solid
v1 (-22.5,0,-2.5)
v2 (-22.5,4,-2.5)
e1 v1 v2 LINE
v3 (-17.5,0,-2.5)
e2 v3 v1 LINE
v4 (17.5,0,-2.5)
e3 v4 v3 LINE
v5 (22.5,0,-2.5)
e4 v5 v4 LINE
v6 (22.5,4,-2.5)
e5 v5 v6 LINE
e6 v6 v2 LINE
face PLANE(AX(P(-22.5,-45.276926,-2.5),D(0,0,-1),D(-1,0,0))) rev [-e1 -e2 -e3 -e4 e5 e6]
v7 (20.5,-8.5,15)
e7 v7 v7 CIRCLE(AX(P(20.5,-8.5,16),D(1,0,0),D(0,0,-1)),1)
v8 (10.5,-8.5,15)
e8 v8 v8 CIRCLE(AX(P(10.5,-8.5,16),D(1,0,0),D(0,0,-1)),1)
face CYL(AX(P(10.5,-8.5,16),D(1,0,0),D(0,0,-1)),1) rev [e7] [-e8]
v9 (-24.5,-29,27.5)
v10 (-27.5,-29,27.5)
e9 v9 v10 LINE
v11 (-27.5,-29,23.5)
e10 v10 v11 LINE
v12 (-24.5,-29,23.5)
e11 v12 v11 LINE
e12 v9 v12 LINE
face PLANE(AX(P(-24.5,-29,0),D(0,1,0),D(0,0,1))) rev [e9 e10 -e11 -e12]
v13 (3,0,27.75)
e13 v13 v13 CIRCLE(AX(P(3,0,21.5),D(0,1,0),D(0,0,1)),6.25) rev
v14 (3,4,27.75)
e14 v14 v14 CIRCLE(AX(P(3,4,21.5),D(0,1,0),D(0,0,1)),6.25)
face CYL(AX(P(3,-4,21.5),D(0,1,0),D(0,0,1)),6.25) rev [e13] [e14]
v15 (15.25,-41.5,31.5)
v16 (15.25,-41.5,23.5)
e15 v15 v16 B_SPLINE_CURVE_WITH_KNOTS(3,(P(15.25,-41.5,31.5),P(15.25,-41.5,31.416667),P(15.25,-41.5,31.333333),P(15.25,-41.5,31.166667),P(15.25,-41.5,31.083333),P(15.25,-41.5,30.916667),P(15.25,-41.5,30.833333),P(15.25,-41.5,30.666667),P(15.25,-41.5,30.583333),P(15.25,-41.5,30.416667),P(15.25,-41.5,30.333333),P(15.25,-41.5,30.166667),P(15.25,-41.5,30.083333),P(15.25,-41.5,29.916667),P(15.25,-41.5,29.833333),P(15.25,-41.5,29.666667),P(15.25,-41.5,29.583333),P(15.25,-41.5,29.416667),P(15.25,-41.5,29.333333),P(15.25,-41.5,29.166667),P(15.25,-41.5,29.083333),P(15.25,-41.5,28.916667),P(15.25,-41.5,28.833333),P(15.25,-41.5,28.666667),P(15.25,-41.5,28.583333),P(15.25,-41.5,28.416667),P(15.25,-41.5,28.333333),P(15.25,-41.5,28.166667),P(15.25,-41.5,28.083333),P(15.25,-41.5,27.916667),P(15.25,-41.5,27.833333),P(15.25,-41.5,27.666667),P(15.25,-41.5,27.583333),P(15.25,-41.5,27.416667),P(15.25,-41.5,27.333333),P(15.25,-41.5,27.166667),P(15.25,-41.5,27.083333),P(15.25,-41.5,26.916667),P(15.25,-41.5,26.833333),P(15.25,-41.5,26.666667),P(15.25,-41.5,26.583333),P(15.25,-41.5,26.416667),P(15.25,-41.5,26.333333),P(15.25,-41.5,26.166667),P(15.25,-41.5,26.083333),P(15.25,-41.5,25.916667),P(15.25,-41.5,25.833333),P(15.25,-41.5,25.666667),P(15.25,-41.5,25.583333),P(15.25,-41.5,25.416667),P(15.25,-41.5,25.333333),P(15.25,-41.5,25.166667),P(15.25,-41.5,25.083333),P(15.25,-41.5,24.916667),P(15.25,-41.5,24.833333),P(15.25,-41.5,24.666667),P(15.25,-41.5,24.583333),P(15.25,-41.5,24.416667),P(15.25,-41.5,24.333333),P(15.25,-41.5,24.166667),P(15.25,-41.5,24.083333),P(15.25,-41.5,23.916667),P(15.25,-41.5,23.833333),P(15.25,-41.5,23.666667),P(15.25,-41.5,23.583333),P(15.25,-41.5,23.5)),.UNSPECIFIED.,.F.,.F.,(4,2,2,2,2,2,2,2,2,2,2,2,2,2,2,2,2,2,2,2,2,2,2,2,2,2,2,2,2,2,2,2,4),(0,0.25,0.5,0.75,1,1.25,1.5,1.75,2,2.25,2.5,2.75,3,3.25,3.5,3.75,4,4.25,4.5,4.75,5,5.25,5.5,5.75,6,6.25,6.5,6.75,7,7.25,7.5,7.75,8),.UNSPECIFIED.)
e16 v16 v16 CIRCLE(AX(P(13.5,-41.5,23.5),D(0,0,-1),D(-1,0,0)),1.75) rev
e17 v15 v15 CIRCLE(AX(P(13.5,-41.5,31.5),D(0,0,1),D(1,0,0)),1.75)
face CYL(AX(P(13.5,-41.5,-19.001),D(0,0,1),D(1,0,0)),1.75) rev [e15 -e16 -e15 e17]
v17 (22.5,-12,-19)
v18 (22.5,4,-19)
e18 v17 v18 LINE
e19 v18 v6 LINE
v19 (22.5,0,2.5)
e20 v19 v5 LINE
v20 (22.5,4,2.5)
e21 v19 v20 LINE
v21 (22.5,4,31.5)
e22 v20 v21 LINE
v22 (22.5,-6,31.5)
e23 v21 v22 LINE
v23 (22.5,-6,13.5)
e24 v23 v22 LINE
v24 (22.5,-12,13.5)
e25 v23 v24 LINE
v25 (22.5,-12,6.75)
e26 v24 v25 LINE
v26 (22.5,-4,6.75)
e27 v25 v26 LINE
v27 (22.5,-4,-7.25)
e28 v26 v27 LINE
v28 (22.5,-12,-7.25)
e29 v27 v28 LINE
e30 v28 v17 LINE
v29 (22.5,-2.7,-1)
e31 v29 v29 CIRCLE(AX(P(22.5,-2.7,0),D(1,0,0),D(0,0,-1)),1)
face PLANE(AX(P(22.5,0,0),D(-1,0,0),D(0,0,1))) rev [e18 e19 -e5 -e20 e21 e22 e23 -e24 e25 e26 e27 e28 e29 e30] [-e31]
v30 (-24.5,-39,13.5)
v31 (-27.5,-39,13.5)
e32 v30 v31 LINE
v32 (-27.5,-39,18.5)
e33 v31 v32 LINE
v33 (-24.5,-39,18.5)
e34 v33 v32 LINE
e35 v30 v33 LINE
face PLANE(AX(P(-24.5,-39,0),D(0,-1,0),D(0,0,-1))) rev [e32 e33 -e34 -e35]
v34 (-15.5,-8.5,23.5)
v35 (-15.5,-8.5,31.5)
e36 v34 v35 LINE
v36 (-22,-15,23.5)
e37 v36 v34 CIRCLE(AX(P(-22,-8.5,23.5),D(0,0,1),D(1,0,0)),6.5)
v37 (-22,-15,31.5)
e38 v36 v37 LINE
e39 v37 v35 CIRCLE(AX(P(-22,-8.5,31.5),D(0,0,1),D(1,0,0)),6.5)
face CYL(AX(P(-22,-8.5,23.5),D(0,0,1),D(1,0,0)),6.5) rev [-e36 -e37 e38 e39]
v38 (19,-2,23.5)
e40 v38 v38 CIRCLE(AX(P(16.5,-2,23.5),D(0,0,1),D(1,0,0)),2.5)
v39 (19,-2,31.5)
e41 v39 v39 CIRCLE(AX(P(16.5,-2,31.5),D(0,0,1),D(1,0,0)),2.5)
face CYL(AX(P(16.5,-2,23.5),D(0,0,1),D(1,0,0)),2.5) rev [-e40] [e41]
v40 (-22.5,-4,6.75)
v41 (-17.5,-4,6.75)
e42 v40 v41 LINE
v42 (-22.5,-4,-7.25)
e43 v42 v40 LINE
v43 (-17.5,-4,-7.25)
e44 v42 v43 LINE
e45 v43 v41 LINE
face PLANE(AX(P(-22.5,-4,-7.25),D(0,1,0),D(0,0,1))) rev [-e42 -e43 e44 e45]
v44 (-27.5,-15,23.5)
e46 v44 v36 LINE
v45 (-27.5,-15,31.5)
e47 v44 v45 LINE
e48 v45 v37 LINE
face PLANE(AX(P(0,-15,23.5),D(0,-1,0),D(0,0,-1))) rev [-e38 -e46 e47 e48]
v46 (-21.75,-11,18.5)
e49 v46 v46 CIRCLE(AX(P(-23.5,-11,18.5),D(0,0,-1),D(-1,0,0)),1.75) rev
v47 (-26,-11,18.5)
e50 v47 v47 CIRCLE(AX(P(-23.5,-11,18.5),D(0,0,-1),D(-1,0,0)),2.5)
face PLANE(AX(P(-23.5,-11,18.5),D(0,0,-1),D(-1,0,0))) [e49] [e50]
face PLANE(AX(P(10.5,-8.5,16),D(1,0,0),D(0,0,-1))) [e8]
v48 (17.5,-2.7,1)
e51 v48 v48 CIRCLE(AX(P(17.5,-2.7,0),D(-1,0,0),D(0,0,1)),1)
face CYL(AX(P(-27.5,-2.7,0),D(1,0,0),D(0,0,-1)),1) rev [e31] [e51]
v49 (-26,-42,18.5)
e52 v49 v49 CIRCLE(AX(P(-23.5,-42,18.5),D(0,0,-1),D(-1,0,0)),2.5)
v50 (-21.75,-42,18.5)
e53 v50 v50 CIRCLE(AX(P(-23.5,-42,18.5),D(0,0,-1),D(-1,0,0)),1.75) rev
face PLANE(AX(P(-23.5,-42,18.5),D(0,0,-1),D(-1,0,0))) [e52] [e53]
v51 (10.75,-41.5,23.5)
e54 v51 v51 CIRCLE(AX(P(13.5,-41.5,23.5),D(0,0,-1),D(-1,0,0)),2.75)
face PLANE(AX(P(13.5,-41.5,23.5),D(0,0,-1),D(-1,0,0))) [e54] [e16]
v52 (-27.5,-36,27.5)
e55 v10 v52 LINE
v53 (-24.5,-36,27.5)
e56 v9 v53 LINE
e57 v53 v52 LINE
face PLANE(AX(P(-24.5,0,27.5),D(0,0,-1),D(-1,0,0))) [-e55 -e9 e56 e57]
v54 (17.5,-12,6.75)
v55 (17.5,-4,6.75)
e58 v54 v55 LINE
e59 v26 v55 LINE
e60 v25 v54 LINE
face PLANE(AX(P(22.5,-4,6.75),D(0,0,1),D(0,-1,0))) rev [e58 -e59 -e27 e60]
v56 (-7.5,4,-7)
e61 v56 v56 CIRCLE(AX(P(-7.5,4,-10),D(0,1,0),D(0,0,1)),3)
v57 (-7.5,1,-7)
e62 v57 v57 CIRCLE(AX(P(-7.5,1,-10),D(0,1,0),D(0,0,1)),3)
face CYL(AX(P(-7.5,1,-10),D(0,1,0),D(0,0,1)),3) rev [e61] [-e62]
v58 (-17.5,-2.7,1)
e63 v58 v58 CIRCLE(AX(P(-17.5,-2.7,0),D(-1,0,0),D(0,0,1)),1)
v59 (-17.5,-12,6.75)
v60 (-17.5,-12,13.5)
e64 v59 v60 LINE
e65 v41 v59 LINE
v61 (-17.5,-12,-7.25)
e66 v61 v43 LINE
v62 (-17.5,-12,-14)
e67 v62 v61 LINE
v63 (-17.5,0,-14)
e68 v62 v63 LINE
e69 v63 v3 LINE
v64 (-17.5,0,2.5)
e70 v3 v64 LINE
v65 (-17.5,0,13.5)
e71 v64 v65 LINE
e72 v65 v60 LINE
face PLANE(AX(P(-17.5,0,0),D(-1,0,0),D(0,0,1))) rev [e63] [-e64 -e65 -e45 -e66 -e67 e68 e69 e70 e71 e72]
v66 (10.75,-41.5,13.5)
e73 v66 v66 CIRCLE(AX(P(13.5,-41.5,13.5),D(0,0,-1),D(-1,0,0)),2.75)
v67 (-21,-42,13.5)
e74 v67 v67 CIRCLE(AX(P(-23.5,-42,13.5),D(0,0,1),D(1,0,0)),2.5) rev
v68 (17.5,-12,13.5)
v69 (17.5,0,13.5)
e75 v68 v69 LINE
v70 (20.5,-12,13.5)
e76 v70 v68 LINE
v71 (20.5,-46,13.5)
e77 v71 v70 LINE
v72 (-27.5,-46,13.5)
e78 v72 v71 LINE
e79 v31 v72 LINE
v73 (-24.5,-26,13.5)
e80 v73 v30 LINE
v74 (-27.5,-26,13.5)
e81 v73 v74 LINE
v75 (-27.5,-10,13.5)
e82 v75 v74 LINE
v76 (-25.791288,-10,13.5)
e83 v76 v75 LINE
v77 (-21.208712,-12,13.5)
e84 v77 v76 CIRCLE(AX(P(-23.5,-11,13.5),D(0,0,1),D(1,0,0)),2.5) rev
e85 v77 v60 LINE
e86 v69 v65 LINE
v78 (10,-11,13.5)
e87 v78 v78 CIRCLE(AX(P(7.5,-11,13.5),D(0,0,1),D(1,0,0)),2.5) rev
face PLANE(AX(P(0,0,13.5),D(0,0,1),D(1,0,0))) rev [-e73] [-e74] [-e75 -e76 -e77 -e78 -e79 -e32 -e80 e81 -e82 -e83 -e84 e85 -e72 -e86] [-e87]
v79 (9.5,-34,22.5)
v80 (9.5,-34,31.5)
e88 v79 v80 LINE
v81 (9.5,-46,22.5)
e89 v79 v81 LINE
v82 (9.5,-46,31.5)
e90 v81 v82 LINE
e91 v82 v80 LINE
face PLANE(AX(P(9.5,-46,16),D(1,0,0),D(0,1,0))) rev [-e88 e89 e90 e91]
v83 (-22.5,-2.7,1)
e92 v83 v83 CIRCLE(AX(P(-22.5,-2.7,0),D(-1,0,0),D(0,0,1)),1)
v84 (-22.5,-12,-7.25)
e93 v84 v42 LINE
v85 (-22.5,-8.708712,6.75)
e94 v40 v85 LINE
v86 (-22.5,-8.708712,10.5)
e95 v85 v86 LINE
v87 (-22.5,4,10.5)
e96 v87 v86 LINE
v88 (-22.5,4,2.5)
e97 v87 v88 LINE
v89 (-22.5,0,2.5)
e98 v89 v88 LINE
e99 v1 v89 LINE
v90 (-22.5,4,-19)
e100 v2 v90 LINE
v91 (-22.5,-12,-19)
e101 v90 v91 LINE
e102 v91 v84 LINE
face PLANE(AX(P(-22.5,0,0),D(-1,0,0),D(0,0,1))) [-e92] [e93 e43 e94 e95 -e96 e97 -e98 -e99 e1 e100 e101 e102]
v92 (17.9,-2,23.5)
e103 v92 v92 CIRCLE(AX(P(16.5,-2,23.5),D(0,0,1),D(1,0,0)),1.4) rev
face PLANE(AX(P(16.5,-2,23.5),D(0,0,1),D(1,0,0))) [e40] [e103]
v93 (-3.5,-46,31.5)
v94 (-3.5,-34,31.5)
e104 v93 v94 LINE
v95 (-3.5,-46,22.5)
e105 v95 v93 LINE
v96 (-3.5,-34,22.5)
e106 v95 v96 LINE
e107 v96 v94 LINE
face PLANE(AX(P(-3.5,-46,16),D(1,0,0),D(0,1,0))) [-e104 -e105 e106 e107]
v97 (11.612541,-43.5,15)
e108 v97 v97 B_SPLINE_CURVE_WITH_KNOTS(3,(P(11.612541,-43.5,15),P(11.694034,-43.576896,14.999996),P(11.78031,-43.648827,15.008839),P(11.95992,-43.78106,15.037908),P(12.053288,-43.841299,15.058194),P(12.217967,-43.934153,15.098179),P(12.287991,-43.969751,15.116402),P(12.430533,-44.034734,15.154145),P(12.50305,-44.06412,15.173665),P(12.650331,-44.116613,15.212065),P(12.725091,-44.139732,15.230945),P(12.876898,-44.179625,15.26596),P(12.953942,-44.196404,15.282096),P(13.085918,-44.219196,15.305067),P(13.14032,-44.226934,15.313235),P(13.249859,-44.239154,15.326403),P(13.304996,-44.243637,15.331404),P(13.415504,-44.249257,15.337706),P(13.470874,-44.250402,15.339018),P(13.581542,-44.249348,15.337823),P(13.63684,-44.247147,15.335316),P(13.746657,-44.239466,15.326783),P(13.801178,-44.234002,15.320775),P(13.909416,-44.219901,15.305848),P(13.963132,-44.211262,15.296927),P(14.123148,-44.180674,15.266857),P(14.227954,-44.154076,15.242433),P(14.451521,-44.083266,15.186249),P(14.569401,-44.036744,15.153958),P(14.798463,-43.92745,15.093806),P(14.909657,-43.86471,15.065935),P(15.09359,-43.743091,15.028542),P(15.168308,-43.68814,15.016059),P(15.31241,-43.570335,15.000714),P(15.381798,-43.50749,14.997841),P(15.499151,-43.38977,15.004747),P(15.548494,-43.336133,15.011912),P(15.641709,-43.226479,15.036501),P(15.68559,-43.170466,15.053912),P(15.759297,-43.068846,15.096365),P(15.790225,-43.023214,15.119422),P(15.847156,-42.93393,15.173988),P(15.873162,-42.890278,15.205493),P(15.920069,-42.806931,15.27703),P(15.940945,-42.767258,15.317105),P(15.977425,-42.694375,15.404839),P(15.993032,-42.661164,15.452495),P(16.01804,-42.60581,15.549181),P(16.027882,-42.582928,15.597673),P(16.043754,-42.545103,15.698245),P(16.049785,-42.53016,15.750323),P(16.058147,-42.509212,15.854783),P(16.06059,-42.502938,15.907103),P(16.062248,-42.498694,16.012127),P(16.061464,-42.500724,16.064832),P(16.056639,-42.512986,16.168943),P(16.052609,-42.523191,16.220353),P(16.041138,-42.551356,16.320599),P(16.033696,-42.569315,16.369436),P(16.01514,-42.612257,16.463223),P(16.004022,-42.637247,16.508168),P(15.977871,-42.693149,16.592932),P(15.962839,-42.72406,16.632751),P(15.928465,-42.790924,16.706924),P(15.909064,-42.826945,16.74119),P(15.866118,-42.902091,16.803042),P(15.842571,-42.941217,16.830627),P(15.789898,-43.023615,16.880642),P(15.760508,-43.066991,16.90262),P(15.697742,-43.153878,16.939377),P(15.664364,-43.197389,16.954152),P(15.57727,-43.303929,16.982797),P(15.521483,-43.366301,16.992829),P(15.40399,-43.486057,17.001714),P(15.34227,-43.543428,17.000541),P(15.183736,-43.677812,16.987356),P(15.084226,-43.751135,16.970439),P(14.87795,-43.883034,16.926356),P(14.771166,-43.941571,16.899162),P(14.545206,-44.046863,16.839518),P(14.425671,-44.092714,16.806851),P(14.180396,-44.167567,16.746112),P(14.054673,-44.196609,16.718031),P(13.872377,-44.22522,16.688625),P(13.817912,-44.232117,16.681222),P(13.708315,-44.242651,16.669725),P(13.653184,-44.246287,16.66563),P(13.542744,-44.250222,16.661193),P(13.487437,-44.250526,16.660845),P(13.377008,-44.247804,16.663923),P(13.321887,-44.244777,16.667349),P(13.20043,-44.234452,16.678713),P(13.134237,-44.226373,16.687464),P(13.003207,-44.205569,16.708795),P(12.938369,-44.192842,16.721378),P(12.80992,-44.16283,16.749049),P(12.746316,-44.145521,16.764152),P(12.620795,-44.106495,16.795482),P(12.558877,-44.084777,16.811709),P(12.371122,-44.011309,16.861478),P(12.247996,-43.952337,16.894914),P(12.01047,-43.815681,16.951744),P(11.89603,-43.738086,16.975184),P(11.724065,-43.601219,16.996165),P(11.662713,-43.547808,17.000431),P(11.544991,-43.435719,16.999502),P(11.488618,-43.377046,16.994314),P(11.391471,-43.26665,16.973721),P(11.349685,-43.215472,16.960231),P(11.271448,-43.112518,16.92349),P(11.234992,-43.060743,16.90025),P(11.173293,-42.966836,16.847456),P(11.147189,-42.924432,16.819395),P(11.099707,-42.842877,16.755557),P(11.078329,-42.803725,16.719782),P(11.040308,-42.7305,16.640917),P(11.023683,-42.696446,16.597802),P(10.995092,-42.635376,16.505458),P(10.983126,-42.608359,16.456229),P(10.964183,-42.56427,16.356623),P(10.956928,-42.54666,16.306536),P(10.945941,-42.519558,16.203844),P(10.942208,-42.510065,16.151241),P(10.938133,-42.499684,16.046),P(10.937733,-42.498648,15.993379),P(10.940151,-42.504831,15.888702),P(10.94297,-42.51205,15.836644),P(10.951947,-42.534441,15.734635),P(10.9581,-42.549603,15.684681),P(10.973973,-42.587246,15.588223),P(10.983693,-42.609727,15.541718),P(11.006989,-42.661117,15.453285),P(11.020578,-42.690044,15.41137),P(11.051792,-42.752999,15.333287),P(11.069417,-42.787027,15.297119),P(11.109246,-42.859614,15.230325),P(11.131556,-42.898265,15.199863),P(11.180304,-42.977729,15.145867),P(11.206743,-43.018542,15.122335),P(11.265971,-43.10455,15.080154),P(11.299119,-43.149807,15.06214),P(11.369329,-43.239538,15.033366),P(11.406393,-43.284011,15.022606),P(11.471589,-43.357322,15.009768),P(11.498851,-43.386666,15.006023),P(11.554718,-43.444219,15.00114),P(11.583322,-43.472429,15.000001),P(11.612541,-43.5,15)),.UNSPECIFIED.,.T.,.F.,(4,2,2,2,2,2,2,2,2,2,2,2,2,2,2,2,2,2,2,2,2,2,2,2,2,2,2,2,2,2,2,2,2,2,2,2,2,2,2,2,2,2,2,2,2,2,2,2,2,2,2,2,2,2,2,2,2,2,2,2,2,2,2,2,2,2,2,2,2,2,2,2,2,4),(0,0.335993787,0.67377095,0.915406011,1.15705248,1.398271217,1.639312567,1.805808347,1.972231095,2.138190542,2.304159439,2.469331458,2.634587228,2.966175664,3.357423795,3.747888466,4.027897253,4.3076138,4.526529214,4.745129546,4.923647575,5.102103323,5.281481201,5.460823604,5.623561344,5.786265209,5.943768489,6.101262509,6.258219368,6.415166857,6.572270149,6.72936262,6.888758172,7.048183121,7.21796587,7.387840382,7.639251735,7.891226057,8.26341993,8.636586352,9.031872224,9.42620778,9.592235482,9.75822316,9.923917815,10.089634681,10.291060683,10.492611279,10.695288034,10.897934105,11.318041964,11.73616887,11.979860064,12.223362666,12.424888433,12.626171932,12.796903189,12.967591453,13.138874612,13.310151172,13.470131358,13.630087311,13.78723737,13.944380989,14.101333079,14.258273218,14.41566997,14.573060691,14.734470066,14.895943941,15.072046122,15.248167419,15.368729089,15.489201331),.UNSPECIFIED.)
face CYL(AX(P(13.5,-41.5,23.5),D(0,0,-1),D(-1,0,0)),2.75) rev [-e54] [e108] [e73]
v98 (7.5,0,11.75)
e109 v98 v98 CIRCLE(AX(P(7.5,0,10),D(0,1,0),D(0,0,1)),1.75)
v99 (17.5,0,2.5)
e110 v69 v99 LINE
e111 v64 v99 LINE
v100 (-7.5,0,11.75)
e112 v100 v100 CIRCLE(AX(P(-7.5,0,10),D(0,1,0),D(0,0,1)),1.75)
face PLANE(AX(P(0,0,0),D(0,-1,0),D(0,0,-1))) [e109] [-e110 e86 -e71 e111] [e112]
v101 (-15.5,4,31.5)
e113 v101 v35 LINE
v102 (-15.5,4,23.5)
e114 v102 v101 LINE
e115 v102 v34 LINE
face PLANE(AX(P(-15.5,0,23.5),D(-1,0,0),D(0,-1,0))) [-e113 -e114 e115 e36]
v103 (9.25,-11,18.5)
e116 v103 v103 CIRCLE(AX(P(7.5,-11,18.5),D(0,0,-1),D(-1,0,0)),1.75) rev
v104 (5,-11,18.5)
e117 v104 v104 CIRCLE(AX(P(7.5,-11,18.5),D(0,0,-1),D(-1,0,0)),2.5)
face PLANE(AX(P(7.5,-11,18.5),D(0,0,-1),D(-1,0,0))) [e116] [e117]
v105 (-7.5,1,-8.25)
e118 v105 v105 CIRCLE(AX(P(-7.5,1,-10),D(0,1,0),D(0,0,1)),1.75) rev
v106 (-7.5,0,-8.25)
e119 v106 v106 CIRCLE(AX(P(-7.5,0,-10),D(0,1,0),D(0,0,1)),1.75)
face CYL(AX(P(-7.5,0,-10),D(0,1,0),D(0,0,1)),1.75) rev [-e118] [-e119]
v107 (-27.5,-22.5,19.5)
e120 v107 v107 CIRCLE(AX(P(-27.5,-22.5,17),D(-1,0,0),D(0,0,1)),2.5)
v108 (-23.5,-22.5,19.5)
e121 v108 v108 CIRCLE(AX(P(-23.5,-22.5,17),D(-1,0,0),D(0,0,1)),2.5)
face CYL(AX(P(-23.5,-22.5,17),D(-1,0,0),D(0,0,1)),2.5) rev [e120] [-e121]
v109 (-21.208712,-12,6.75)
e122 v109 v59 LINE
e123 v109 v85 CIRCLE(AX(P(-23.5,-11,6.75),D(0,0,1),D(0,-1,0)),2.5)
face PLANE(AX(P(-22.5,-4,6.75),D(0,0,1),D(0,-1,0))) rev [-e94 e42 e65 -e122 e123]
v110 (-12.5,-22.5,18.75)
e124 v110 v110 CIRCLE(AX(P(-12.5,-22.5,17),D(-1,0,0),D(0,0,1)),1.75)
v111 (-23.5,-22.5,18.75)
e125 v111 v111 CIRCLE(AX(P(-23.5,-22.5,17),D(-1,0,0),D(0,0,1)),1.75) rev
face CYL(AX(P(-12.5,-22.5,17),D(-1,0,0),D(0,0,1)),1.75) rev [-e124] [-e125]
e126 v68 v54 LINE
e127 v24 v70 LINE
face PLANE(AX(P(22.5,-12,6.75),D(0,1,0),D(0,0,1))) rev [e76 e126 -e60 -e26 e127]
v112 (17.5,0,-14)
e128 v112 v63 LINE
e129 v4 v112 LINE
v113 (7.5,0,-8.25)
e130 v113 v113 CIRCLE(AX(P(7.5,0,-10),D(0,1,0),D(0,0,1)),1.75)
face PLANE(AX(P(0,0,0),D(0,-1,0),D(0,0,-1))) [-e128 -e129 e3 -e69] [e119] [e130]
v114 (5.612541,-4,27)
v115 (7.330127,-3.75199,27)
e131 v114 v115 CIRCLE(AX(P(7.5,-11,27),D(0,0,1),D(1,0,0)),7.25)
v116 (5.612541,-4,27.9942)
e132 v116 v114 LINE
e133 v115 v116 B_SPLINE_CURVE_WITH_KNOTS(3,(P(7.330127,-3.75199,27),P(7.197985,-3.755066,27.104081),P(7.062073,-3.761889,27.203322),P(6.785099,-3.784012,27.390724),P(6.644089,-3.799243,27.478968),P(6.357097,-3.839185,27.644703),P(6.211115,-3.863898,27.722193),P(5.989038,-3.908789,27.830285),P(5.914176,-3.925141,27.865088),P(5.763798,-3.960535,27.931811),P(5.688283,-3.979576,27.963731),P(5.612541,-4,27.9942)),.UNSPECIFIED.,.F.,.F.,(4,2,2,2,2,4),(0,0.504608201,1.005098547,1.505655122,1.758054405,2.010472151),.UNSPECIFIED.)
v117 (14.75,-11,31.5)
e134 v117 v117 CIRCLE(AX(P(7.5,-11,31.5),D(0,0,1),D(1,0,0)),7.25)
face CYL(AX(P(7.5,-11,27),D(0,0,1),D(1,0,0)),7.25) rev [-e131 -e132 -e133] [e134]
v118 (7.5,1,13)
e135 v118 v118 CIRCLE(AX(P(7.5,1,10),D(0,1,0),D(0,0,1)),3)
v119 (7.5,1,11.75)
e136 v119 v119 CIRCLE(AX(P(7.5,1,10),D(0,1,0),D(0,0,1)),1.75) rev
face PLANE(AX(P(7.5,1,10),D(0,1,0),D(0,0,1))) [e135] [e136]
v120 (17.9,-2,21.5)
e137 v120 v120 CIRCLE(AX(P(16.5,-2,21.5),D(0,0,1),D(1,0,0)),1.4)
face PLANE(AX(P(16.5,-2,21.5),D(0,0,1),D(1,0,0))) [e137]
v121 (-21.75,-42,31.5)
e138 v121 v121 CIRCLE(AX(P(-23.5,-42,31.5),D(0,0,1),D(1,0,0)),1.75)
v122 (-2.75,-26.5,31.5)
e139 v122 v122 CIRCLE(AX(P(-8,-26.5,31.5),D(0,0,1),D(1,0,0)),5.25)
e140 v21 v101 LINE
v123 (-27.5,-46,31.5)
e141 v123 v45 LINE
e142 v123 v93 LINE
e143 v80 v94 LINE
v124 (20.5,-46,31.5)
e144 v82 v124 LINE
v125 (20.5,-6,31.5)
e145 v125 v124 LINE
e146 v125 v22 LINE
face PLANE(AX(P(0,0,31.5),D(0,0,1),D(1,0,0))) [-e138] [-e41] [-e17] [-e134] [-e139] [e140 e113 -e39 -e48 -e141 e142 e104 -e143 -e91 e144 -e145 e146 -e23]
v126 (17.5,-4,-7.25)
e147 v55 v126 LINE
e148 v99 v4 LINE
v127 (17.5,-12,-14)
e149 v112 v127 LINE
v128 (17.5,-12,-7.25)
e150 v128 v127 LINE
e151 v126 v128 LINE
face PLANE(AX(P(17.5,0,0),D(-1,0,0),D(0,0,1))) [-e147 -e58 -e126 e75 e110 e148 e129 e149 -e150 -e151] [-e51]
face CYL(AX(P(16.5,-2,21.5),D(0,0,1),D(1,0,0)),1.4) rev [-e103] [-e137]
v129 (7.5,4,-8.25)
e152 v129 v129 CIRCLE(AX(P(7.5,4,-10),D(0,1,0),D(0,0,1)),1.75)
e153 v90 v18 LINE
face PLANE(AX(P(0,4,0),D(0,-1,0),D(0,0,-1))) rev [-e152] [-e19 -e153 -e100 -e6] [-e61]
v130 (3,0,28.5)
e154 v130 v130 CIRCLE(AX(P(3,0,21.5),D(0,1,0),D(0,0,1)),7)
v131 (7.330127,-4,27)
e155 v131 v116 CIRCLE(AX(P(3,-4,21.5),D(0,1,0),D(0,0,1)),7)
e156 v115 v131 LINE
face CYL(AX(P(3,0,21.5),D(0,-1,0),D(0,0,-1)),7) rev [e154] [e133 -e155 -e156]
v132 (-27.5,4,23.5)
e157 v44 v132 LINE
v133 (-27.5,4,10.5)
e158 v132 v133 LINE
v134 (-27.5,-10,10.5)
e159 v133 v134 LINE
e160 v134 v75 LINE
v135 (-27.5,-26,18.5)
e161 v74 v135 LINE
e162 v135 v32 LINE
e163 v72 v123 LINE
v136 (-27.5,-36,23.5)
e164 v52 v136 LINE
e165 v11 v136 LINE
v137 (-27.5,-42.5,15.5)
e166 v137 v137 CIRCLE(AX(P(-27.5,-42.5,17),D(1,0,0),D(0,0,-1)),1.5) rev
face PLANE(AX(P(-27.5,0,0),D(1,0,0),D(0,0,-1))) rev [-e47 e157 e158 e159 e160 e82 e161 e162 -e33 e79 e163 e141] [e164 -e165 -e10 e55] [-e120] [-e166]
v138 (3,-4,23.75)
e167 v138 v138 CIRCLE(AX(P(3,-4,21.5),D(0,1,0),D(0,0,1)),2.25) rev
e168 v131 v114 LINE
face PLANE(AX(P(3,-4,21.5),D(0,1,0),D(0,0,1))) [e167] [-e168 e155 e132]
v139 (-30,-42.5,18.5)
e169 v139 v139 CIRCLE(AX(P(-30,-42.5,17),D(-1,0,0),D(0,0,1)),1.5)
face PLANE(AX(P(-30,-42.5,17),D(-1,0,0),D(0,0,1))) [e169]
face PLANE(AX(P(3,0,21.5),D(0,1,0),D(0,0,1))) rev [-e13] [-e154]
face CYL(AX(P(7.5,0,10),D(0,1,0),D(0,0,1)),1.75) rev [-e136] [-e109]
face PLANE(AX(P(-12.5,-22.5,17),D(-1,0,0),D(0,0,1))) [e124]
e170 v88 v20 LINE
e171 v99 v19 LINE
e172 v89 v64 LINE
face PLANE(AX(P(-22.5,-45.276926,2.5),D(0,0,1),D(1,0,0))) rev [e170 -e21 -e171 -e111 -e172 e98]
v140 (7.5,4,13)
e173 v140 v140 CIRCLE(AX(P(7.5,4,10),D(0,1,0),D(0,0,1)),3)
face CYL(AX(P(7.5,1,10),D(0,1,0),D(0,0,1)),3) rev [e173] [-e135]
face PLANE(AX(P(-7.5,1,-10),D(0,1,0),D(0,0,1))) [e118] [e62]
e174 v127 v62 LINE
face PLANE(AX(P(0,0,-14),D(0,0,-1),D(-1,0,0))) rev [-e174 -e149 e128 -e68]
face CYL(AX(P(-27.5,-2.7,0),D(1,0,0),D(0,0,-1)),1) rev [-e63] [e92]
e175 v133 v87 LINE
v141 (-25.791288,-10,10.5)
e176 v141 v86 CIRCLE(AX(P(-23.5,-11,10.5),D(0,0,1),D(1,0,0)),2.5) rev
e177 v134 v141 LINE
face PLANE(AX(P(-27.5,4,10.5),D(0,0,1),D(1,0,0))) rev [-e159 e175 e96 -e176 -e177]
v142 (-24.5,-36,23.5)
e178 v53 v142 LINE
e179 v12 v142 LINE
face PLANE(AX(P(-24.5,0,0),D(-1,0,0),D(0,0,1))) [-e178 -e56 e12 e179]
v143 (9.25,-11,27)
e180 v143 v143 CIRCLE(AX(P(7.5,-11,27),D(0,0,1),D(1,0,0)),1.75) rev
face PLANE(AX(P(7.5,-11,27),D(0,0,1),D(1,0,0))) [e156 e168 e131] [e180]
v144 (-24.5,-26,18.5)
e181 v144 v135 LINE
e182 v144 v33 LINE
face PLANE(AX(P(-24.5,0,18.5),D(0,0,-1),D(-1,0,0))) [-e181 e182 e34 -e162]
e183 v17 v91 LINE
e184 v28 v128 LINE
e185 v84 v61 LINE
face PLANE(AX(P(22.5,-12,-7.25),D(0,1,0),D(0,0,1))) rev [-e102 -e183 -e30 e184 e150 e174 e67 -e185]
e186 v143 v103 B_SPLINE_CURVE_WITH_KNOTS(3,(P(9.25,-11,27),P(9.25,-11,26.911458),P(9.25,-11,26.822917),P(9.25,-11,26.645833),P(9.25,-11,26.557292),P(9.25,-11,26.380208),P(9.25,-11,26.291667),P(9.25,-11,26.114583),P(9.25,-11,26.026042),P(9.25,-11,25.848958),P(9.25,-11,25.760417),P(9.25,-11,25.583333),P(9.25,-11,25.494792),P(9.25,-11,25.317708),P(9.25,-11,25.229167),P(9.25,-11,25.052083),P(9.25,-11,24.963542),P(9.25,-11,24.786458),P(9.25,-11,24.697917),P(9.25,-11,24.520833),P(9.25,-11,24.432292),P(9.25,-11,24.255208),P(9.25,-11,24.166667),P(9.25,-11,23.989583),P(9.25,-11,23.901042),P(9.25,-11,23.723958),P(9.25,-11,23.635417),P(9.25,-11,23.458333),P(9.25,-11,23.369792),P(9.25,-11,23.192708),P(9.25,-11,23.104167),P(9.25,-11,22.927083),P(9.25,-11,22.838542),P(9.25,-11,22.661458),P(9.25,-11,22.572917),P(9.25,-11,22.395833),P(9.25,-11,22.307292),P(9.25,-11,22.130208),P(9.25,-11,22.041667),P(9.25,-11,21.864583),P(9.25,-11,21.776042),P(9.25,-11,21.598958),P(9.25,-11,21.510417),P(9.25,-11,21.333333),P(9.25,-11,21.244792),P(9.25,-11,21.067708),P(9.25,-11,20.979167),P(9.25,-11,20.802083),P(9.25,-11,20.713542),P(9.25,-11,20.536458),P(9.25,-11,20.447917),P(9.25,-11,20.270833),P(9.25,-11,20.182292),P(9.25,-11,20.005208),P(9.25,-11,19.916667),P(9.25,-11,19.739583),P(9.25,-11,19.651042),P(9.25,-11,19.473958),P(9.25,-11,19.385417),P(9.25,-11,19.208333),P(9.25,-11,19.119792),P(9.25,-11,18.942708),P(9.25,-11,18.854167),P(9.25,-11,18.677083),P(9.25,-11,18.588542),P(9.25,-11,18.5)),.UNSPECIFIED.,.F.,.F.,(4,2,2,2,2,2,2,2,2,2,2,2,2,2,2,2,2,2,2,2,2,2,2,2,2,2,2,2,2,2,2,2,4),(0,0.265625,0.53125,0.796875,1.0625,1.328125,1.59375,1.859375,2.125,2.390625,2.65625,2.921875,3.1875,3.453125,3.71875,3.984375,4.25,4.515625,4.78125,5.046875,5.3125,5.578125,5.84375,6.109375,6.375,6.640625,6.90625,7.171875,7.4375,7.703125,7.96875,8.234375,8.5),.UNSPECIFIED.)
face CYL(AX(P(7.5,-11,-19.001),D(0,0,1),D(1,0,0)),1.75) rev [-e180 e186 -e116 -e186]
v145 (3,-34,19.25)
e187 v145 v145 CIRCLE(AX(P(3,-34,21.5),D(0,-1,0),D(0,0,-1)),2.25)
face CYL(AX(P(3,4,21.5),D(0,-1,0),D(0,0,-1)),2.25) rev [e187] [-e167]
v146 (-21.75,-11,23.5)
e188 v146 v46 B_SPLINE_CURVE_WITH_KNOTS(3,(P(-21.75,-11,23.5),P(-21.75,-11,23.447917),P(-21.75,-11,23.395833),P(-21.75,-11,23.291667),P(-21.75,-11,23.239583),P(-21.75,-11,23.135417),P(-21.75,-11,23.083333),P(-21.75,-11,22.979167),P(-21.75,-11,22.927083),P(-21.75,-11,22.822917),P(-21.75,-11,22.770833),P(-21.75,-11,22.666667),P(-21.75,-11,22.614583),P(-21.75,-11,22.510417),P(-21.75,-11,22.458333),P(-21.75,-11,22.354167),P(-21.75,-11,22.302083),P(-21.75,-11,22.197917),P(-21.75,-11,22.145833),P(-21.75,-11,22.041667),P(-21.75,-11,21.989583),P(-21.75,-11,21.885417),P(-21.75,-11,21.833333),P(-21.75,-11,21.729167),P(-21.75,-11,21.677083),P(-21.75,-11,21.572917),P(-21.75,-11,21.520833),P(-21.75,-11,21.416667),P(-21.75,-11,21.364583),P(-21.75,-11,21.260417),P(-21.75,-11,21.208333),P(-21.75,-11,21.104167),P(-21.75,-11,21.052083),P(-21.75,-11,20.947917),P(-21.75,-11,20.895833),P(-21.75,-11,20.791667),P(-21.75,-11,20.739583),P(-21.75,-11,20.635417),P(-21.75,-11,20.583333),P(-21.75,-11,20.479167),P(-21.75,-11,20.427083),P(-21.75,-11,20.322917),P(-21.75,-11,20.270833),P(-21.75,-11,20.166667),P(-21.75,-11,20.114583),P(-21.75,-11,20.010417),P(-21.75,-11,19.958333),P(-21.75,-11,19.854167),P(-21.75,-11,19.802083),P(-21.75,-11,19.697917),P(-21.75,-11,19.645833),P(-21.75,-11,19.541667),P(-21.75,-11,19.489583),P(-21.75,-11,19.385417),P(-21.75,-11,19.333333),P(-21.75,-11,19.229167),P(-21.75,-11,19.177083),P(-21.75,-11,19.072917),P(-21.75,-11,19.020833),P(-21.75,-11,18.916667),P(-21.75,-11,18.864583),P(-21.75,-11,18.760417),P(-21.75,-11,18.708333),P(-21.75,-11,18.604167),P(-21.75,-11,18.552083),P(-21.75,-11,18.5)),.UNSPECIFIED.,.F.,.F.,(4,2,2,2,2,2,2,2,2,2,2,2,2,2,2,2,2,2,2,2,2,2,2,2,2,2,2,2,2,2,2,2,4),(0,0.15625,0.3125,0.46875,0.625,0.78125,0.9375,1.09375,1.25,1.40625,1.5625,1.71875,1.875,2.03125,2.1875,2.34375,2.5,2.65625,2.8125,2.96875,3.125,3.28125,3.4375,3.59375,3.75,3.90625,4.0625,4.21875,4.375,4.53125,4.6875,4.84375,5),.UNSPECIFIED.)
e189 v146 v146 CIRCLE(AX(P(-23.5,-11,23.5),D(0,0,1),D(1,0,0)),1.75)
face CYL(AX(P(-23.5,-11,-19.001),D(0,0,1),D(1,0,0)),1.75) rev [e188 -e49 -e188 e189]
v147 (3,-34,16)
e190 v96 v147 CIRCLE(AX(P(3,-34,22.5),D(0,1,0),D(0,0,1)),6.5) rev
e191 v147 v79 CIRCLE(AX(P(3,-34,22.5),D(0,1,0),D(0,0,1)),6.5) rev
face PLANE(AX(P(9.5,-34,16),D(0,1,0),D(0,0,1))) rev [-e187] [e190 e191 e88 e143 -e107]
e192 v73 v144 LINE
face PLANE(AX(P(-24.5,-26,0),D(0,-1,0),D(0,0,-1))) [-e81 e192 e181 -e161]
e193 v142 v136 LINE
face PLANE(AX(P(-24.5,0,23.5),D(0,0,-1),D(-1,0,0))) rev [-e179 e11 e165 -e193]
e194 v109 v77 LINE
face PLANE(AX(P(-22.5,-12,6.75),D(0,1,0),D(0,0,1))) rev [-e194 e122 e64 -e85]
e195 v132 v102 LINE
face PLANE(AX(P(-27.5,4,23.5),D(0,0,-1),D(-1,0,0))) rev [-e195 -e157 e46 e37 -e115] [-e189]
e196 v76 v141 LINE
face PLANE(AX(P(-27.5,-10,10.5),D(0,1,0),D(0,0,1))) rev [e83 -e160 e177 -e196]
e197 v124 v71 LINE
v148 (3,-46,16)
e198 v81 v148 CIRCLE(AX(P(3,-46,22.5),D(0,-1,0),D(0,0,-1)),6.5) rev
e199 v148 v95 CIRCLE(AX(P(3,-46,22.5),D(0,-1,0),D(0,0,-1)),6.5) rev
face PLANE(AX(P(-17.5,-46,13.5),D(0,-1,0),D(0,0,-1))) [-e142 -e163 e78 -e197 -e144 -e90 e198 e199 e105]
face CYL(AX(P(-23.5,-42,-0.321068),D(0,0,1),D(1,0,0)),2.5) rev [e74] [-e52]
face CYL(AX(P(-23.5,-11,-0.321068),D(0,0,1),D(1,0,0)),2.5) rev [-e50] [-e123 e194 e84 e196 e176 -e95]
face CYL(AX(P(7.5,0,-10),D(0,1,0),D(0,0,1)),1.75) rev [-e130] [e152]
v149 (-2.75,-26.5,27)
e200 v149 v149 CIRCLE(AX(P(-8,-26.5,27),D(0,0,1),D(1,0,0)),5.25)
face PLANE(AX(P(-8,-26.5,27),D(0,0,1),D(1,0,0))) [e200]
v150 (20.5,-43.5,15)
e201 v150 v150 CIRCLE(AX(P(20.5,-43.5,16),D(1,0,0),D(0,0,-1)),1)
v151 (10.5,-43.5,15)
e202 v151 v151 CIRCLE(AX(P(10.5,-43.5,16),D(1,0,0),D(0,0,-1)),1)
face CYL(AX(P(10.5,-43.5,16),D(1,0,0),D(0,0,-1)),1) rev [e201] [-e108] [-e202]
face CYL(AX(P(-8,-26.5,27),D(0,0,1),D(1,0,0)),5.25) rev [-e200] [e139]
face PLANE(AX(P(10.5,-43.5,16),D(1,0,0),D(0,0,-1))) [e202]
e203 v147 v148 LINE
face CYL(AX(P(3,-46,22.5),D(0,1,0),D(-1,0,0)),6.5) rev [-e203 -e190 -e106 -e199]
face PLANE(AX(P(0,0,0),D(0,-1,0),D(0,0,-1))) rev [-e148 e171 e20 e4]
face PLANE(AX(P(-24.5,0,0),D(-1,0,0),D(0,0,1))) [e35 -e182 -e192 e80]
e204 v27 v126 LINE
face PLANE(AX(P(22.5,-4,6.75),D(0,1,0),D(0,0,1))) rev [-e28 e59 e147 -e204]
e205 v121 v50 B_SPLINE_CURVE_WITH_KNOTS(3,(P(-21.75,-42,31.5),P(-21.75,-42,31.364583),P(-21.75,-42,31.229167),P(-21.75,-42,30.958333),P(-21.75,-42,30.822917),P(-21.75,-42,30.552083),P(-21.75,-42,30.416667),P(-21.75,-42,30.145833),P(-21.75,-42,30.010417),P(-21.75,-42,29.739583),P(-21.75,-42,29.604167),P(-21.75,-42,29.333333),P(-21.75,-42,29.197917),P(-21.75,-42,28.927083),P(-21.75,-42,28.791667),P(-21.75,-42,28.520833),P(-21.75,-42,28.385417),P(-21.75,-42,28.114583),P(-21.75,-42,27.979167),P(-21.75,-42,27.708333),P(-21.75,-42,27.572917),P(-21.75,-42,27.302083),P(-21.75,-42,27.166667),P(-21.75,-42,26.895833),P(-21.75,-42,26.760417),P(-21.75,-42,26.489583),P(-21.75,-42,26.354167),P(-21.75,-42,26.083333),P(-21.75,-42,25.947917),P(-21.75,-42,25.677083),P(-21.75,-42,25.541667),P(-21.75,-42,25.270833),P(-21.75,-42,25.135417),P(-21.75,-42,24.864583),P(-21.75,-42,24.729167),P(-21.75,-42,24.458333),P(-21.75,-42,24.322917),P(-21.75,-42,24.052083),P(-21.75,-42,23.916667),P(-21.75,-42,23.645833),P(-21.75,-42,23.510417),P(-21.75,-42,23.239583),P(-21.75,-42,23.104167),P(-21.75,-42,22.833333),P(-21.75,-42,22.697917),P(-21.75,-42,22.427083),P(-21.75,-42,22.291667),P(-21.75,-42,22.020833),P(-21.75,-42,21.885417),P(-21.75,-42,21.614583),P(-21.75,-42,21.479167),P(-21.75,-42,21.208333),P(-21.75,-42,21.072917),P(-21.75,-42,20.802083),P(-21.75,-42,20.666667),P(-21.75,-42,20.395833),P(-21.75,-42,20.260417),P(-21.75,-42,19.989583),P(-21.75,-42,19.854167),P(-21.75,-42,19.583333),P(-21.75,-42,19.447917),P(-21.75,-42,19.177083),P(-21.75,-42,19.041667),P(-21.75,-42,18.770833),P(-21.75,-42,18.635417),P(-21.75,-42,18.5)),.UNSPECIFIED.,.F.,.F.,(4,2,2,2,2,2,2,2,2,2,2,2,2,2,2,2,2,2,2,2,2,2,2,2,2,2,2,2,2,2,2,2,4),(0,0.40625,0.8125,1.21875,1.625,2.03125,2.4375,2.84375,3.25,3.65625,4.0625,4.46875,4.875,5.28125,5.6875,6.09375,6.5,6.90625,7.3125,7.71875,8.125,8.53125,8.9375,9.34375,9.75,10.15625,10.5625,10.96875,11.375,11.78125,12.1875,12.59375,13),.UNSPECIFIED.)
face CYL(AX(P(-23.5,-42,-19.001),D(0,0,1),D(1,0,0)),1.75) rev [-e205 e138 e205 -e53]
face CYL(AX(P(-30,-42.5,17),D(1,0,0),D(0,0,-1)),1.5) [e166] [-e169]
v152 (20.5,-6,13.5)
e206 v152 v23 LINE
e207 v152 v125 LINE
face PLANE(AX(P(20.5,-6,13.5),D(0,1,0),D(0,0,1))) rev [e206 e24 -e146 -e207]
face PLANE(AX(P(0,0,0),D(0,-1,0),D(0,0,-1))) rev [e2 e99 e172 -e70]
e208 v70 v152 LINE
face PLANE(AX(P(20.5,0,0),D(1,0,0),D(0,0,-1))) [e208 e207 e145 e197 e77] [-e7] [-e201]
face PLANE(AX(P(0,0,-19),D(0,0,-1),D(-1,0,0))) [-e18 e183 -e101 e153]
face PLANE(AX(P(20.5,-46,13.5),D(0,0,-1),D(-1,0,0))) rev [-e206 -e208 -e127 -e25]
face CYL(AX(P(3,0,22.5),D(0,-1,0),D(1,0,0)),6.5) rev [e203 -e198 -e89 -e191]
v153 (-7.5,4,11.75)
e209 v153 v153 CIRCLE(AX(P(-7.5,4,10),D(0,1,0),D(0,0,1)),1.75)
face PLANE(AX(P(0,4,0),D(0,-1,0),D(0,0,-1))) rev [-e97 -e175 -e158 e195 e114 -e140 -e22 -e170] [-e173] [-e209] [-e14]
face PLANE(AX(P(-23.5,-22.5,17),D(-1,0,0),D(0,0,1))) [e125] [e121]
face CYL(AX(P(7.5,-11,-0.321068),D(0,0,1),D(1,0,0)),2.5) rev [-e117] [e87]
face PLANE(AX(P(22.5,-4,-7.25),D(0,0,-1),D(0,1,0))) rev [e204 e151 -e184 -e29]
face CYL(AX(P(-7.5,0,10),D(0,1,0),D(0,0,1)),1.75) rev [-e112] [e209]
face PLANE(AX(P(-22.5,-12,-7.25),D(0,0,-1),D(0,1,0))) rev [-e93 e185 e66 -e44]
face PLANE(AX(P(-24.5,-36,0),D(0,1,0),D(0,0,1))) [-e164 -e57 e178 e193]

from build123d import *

# Parameters (mm, degrees)
SKETCH1_W                       = 35
SKETCH1_H                       = 28
BOSS_EXTRUDE1_DEPTH             = 4
SKETCH2_R                       = 1.75
CUT_EXTRUDE1_DEPTH              = 23.765104876
BOSS_EXTRUDE2_DEPTH             = 17.5
BOSS_EXTRUDE2_DEPTH_BACK        = 0.5
SKETCH3_W                       = 35
SKETCH3_H                       = 50
SKETCH7_W                       = 35
SKETCH7_H                       = 37
BOSS_EXTRUDE3_DEPTH             = 5
SKETCH10_R                      = 1.75
CUT_EXTRUDE6_DEPTH              = 5
SKETCH24_W                      = 18
SKETCH24_H                      = 46
BOSS_EXTRUDE4_DEPTH             = 10
SKETCH37_W                      = 13
SKETCH37_H                      = 14
BOSS_EXTRUDE9_DEPTH             = 10
CUT_EXTRUDE19_REACH             = 75.638
SKETCH22_R                      = 1.75
SKETCH22_3_R                    = 7.25
SKETCH22_3_R_2                  = 5.25
CUT_EXTRUDE20_DEPTH             = 4.5
SKETCH22_5_R                    = 1.75
SKETCH22_5_W                    = 2
SKETCH22_5_H                    = 4
CUT_EXTRUDE24_DEPTH             = 8
SKETCH22_4_W                    = 13
SKETCH22_4_H                    = 12
CUT_EXTRUDE21_DEPTH             = 15.5
FILLET3_R                       = 6.5
SKETCH26_R                      = 2.25
CUT_EXTRUDE22_DEPTH             = 57.502212346
SKETCH27_R                      = 6.25
CUT_EXTRUDE23_DEPTH             = 8
BOSS_EXTRUDE11_DEPTH            = 5
BOSS_EXTRUDE12_DEPTH            = 5
SKETCH29_R                      = 2.5
CUT_EXTRUDE25_DEPTH             = 5
CUT_EXTRUDE25_DIRECTION_2_REACH = 64.678
SKETCH55_R                      = 2.75
CUT_EXTRUDE42_DEPTH             = 10
SKETCH30_R                      = 3
CUT_EXTRUDE26_DEPTH             = 3
SKETCH38_R                      = 7
CUT_EXTRUDE31_DEPTH             = 4
SKETCH39_W                      = 5
SKETCH39_H                      = 13
SKETCH39_W_2                    = 4
SKETCH39_H_2                    = 7
CUT_EXTRUDE32_DEPTH             = 3
SKETCH40_R                      = 1.75
CUT_EXTRUDE33_DEPTH             = 15
SKETCH51_R                      = 2.5
CUT_EXTRUDE38_DEPTH             = 4
SKETCH42_R                      = 1.4
CUT_EXTRUDE34_DEPTH             = 10
SKETCH45_R                      = 1
CUT_EXTRUDE35_DEPTH             = 75.888250122
SKETCH46_R                      = 1.5
BOSS_EXTRUDE13_DEPTH            = 2.5
SKETCH48_W                      = 18
SKETCH48_H                      = 40
CUT_EXTRUDE36_DEPTH             = 2
SKETCH49_R                      = 1
CUT_EXTRUDE37_DEPTH             = 10
SKETCH53_W                      = 45
SKETCH53_H                      = 5
CUT_EXTRUDE40_DEPTH             = 4
SKETCH54_W                      = 5
SKETCH54_H                      = 21
CUT_EXTRUDE41_DEPTH             = 72.64670269
SKETCH56_R                      = 2.5
CUT_EXTRUDE43_DEPTH             = 8


with BuildPart() as part:
    # Sketch1 → Boss-Extrude1 (new body)
    with BuildSketch(Plane(origin=(0, 0, 0), x_dir=(1, 0, 0), z_dir=(0, 1, 0))):
        Rectangle(SKETCH1_W, SKETCH1_H)
    extrude(amount=BOSS_EXTRUDE1_DEPTH)

    # Sketch2 → Cut-Extrude1 (cut, through all)
    with BuildSketch(Plane(origin=(0, 4, 0), x_dir=(1, 0, 0), z_dir=(0, 1, 0))):
        with Locations(Location((-7.5, -10, 0), (0, 0, 270))):
            Circle(SKETCH2_R)
        with Locations(Location((-7.5, 10, 0), (0, 0, 270))):
            Circle(SKETCH2_R)
        with Locations(Location((7.5, -10, 0), (0, 0, 270))):
            Circle(SKETCH2_R)
        with Locations(Location((7.5, 10, 0), (0, 0, 270))):
            Circle(SKETCH2_R)
    extrude(amount=-CUT_EXTRUDE1_DEPTH, mode=Mode.SUBTRACT)

    # Sketch3 → Boss-Extrude2 (add, two sides: drawn at the far end of the back side and taken through both)
    with BuildSketch(Plane.XY.offset(14).offset(-BOSS_EXTRUDE2_DEPTH_BACK)):
        with Locations((0, -21)):
            Rectangle(SKETCH3_W, SKETCH3_H)
    extrude(amount=BOSS_EXTRUDE2_DEPTH + BOSS_EXTRUDE2_DEPTH_BACK)

    # Sketch7 → Boss-Extrude3 (add)
    with BuildSketch(Plane(origin=(0, 0, -14), x_dir=(-1, 0, 0), z_dir=(0, 0, -1))):
        with Locations((0, -14.5)):
            Rectangle(SKETCH7_W, SKETCH7_H)
    extrude(amount=BOSS_EXTRUDE3_DEPTH)

    # Sketch10 → Cut-Extrude6 (cut)
    with BuildSketch(Plane(origin=(0, 0, -19), x_dir=(-1, 0, 0), z_dir=(0, 0, -1))):
        with Locations((-5, -30)):
            Circle(SKETCH10_R)
        with Locations((5, -30)):
            Circle(SKETCH10_R)
    extrude(amount=-CUT_EXTRUDE6_DEPTH, mode=Mode.SUBTRACT)

    # Sketch24 → Boss-Extrude4 (add)
    with BuildSketch(Plane.ZY.offset(17.5)):
        with Locations((22.5, -23)):
            Rectangle(SKETCH24_W, SKETCH24_H)
    extrude(amount=BOSS_EXTRUDE4_DEPTH)

    # Sketch37 → Boss-Extrude9 (add)
    with BuildSketch(Plane.ZY.offset(17.5)):
        with Locations((17, -3)):
            Rectangle(SKETCH37_W, SKETCH37_H)
    extrude(amount=BOSS_EXTRUDE9_DEPTH)

    # Sketch22 → Cut-Extrude19 (cut, up to next)
    with BuildSketch(Plane.XY.offset(31.5), mode=Mode.PRIVATE) as cut_extrude19_sk1:
        with Locations((-23.5, -42)):
            Circle(SKETCH22_R)
    cut_extrude19_tool1 = extrude(cut_extrude19_sk1.sketch, amount=-CUT_EXTRUDE19_REACH, mode=Mode.PRIVATE) & part.part
    # Sketch22 → Cut-Extrude19 (cut, up to next)
    with BuildSketch(Plane.XY.offset(31.5), mode=Mode.PRIVATE) as cut_extrude19_sk2:
        with Locations((13.5, -41.5)):
            Circle(SKETCH22_R)
    cut_extrude19_tool2 = extrude(cut_extrude19_sk2.sketch, amount=-CUT_EXTRUDE19_REACH, mode=Mode.PRIVATE) & part.part
    # Sketch22 → Cut-Extrude19 (cut, up to next)
    with BuildSketch(Plane.XY.offset(31.5), mode=Mode.PRIVATE) as cut_extrude19_sk3:
        with Locations((7.5, -11)):
            Circle(SKETCH22_R)
    cut_extrude19_tool3 = extrude(cut_extrude19_sk3.sketch, amount=-CUT_EXTRUDE19_REACH, mode=Mode.PRIVATE) & part.part
    # Sketch22 → Cut-Extrude19 (cut, up to next)
    with BuildSketch(Plane.XY.offset(31.5), mode=Mode.PRIVATE) as cut_extrude19_sk4:
        with Locations((-23.5, -11)):
            Circle(SKETCH22_R)
    cut_extrude19_tool4 = extrude(cut_extrude19_sk4.sketch, amount=-CUT_EXTRUDE19_REACH, mode=Mode.PRIVATE) & part.part
    add(cut_extrude19_tool1.solids().sort_by_distance((-23.5, -42, 31.5))[0], mode=Mode.SUBTRACT)
    add(cut_extrude19_tool2.solids().sort_by_distance((13.5, -41.5, 31.5))[0], mode=Mode.SUBTRACT)
    add(cut_extrude19_tool3.solids().sort_by_distance((7.5, -11, 31.5))[0], mode=Mode.SUBTRACT)
    add(cut_extrude19_tool4.solids().sort_by_distance((-23.5, -11, 31.5))[0], mode=Mode.SUBTRACT)

    # Sketch22<3> → Cut-Extrude20 (cut)
    with BuildSketch(Plane.XY.offset(31.5)):
        with Locations((7.5, -11)):
            Circle(SKETCH22_3_R)
        with Locations((-8, -26.5)):
            Circle(SKETCH22_3_R_2)
    extrude(amount=-CUT_EXTRUDE20_DEPTH, mode=Mode.SUBTRACT)

    # Sketch22<5> → Cut-Extrude24 (cut)
    # profile 1 of 2: a face of its own
    with BuildSketch(Plane.XY.offset(31.5)):
        with BuildLine():
            Line((-15.5, -8.5), (-15.5, 0))
            Line((-15.5, 0), (-17.5, 0))
            Line((-17.5, 0), (-27.5, 0))
            Line((-27.5, 0), (-27.5, -15))
            Line((-27.5, -15), (-22, -15))
            ThreePointArc((-22, -15), (-17.403805922, -13.096194078), (-15.5, -8.5))
        make_face()
        with Locations((-23.5, -11)):
            Circle(SKETCH22_5_R, mode=Mode.SUBTRACT)
    # profile 2 of 2: a face of its own
    with BuildSketch(Plane.XY.offset(31.5)):
        with Locations((-16.5, 2)):
            Rectangle(SKETCH22_5_W, SKETCH22_5_H)
    extrude(amount=-CUT_EXTRUDE24_DEPTH, mode=Mode.SUBTRACT)

    # Sketch22<4> → Cut-Extrude21 (cut)
    with BuildSketch(Plane.XY.offset(31.5)):
        with Locations((3, -40)):
            Rectangle(SKETCH22_4_W, SKETCH22_4_H)
    extrude(amount=-CUT_EXTRUDE21_DEPTH, mode=Mode.SUBTRACT)

    # Fillet3
    fillet3_edges = [part.edges().sort_by_distance(p)[0] for p in [
        (9.5, -40, 16),
        (-3.5, -40, 16),
    ]]
    fillet(fillet3_edges, radius=FILLET3_R - 0.0001)  # a hair under: the kernel refuses the full size

    # Sketch26 → Cut-Extrude22 (cut, through all)
    with BuildSketch(Plane.XZ.offset(34)):
        with Locations(Location((3, 21.5, 0), (0, 0, 270))):
            Circle(SKETCH26_R)
    extrude(amount=-CUT_EXTRUDE22_DEPTH, mode=Mode.SUBTRACT)

    # Sketch27 → Cut-Extrude23 (cut)
    with BuildSketch(Plane(origin=(0, 4, 0), x_dir=(1, 0, 0), z_dir=(0, 1, 0))):
        with Locations(Location((3, -21.5, 0), (0, 0, 270))):
            Circle(SKETCH27_R)
    extrude(amount=-CUT_EXTRUDE23_DEPTH, mode=Mode.SUBTRACT)

    # Sketch43 → Boss-Extrude11 (add)
    with BuildSketch(Plane(origin=(17.5, 0, 0), x_dir=(0, 0, -1), z_dir=(1, 0, 0))):
        Polygon((-31.5, -46), (-31.5, 4), (19, 4), (19, -33), (14, -33), (14, -12), (7.25, -12), (7.25, -4), (-6.75, -4), (-6.75, -12), (-13.5, -12), (-13.5, -46), align=None)
    extrude(amount=BOSS_EXTRUDE11_DEPTH)

    # Sketch44 → Boss-Extrude12 (add)
    with BuildSketch(Plane.ZY.offset(17.5)):
        Polygon((10.5, 4), (-19, 4), (-19, -33), (-14, -33), (-14, -12), (-7.25, -12), (-7.25, -4), (6.75, -4), (6.75, -12), (13.5, -12), (13.5, -10), (10.5, -10), align=None)
    extrude(amount=BOSS_EXTRUDE12_DEPTH)

    # Sketch29 → Cut-Extrude25 (cut)
    with BuildSketch(Plane(origin=(0, 0, 13.5), x_dir=(-1, 0, 0), z_dir=(0, 0, -1))):
        with Locations(Location((-7.5, -11, 0), (0, 0, 180))):
            Circle(SKETCH29_R)
        with Locations(Location((23.5, -42, 0), (0, 0, 180))):
            Circle(SKETCH29_R)
        with Locations(Location((23.5, -11, 0), (0, 0, 203.578178478))):
            Circle(SKETCH29_R)
    extrude(amount=-CUT_EXTRUDE25_DEPTH, mode=Mode.SUBTRACT)

    # Cut-Extrude25 direction 2: up to this face of the body (flat: up to its plane)
    cut_extrude25_direction_2_end = Plane(part.part.faces().sort_by_distance((-20, -8, 6.75))[0])
    # Sketch29 → Cut-Extrude25 direction 2 (cut, up to the picked face)
    with BuildSketch(Plane(origin=(0, 0, 13.5), x_dir=(-1, 0, 0), z_dir=(0, 0, -1)), mode=Mode.PRIVATE) as cut_extrude25_direction_2_sk1:
        with Locations(Location((-7.5, -11, 0), (0, 0, 180))):
            Circle(SKETCH29_R)
    cut_extrude25_direction_2_tool1 = split(extrude(cut_extrude25_direction_2_sk1.sketch, amount=CUT_EXTRUDE25_DIRECTION_2_REACH, mode=Mode.PRIVATE), bisect_by=cut_extrude25_direction_2_end, keep=Keep.BOTH, mode=Mode.PRIVATE)
    # Sketch29 → Cut-Extrude25 direction 2 (cut, up to the picked face)
    with BuildSketch(Plane(origin=(0, 0, 13.5), x_dir=(-1, 0, 0), z_dir=(0, 0, -1)), mode=Mode.PRIVATE) as cut_extrude25_direction_2_sk2:
        with Locations(Location((23.5, -42, 0), (0, 0, 180))):
            Circle(SKETCH29_R)
    cut_extrude25_direction_2_tool2 = split(extrude(cut_extrude25_direction_2_sk2.sketch, amount=CUT_EXTRUDE25_DIRECTION_2_REACH, mode=Mode.PRIVATE), bisect_by=cut_extrude25_direction_2_end, keep=Keep.BOTH, mode=Mode.PRIVATE)
    # Sketch29 → Cut-Extrude25 direction 2 (cut, up to the picked face)
    with BuildSketch(Plane(origin=(0, 0, 13.5), x_dir=(-1, 0, 0), z_dir=(0, 0, -1)), mode=Mode.PRIVATE) as cut_extrude25_direction_2_sk3:
        with Locations(Location((23.5, -11, 0), (0, 0, 203.578178478))):
            Circle(SKETCH29_R)
    cut_extrude25_direction_2_tool3 = split(extrude(cut_extrude25_direction_2_sk3.sketch, amount=CUT_EXTRUDE25_DIRECTION_2_REACH, mode=Mode.PRIVATE), bisect_by=cut_extrude25_direction_2_end, keep=Keep.BOTH, mode=Mode.PRIVATE)
    add(cut_extrude25_direction_2_tool1.solids().sort_by(Axis((7.5, -11, 13.5), (0, 0, -1)))[0], mode=Mode.SUBTRACT)
    add(cut_extrude25_direction_2_tool2.solids().sort_by(Axis((-23.5, -42, 13.5), (0, 0, -1)))[0], mode=Mode.SUBTRACT)
    add(cut_extrude25_direction_2_tool3.solids().sort_by(Axis((-23.5, -11, 13.5), (0, 0, -1)))[0], mode=Mode.SUBTRACT)

    # Sketch55 → Cut-Extrude42 (cut)
    with BuildSketch(Plane(origin=(0, 0, 13.5), x_dir=(-1, 0, 0), z_dir=(0, 0, -1))):
        with Locations((-13.5, -41.5)):
            Circle(SKETCH55_R)
    extrude(amount=-CUT_EXTRUDE42_DEPTH, mode=Mode.SUBTRACT)

    # Sketch30 → Cut-Extrude26 (cut)
    with BuildSketch(Plane(origin=(0, 4, 0), x_dir=(1, 0, 0), z_dir=(0, 1, 0))):
        with Locations(Location((-7.5, 10, 0), (0, 0, 270))):
            Circle(SKETCH30_R)
        with Locations(Location((7.5, -10, 0), (0, 0, 270))):
            Circle(SKETCH30_R)
    extrude(amount=-CUT_EXTRUDE26_DEPTH, mode=Mode.SUBTRACT)

    # Sketch38 → Cut-Extrude31 (cut)
    with BuildSketch(Plane(origin=(0, -4, 0), x_dir=(1, 0, 0), z_dir=(0, 1, 0))):
        with Locations(Location((3, -21.5, 0), (0, 0, 308.213210702))):
            Circle(SKETCH38_R)
    extrude(amount=CUT_EXTRUDE31_DEPTH, mode=Mode.SUBTRACT)

    # Sketch39 → Cut-Extrude32 (cut)
    with BuildSketch(Plane.ZY.offset(27.5)):
        with Locations((16, -32.5)):
            Rectangle(SKETCH39_W, SKETCH39_H)
        with Locations((25.5, -32.5)):
            Rectangle(SKETCH39_W_2, SKETCH39_H_2)
    extrude(amount=-CUT_EXTRUDE32_DEPTH, mode=Mode.SUBTRACT)

    # Sketch40 → Cut-Extrude33 (cut)
    with BuildSketch(Plane.ZY.offset(27.5)):
        with Locations((17, -22.5)):
            Circle(SKETCH40_R)
    extrude(amount=-CUT_EXTRUDE33_DEPTH, mode=Mode.SUBTRACT)

    # Sketch51 → Cut-Extrude38 (cut)
    with BuildSketch(Plane.ZY.offset(27.5)):
        with Locations((17, -22.5)):
            Circle(SKETCH51_R)
    extrude(amount=-CUT_EXTRUDE38_DEPTH, mode=Mode.SUBTRACT)

    # Sketch42 → Cut-Extrude34 (cut)
    with BuildSketch(Plane.XY.offset(31.5)):
        with Locations((16.5, -2)):
            Circle(SKETCH42_R)
    extrude(amount=-CUT_EXTRUDE34_DEPTH, mode=Mode.SUBTRACT)

    # Sketch45 → Cut-Extrude35 (cut, through all)
    with BuildSketch(Plane(origin=(22.5, 0, 0), x_dir=(0, 0, -1), z_dir=(1, 0, 0))):
        with Locations((0, -2.7)):
            Circle(SKETCH45_R)
    extrude(amount=-CUT_EXTRUDE35_DEPTH, mode=Mode.SUBTRACT)

    # Sketch46 → Boss-Extrude13 (add)
    with BuildSketch(Plane.ZY.offset(27.5)):
        with Locations(Location((17, -42.5, 0), (0, 0, 180))):
            Circle(SKETCH46_R)
    extrude(amount=BOSS_EXTRUDE13_DEPTH)

    # Sketch48 → Cut-Extrude36 (cut)
    with BuildSketch(Plane(origin=(22.5, 0, 0), x_dir=(0, 0, -1), z_dir=(1, 0, 0))):
        with Locations((-22.5, -26)):
            Rectangle(SKETCH48_W, SKETCH48_H)
    extrude(amount=-CUT_EXTRUDE36_DEPTH, mode=Mode.SUBTRACT)

    # Sketch49 → Cut-Extrude37 (cut)
    with BuildSketch(Plane(origin=(20.5, 0, 0), x_dir=(0, 0, -1), z_dir=(1, 0, 0))):
        with Locations((-16, -43.5)):
            Circle(SKETCH49_R)
        with Locations((-16, -8.5)):
            Circle(SKETCH49_R)
    extrude(amount=-CUT_EXTRUDE37_DEPTH, mode=Mode.SUBTRACT)

    # Sketch53 → Cut-Extrude40 (cut)
    with BuildSketch(Plane(origin=(0, 4, 0), x_dir=(1, 0, 0), z_dir=(0, 1, 0))):
        Rectangle(SKETCH53_W, SKETCH53_H)
    extrude(amount=-CUT_EXTRUDE40_DEPTH, mode=Mode.SUBTRACT)

    # Sketch54 → Cut-Extrude41 (cut, through all)
    with BuildSketch(Plane.ZY.offset(22.5)):
        with Locations((-16.5, -22.5)):
            Rectangle(SKETCH54_W, SKETCH54_H)
    extrude(amount=-CUT_EXTRUDE41_DEPTH, mode=Mode.SUBTRACT)

    # Sketch56 → Cut-Extrude43 (cut)
    with BuildSketch(Plane.XY.offset(31.5)):
        with Locations((16.5, -2)):
            Circle(SKETCH56_R)
    extrude(amount=-CUT_EXTRUDE43_DEPTH, mode=Mode.SUBTRACT)


solid = part.part
